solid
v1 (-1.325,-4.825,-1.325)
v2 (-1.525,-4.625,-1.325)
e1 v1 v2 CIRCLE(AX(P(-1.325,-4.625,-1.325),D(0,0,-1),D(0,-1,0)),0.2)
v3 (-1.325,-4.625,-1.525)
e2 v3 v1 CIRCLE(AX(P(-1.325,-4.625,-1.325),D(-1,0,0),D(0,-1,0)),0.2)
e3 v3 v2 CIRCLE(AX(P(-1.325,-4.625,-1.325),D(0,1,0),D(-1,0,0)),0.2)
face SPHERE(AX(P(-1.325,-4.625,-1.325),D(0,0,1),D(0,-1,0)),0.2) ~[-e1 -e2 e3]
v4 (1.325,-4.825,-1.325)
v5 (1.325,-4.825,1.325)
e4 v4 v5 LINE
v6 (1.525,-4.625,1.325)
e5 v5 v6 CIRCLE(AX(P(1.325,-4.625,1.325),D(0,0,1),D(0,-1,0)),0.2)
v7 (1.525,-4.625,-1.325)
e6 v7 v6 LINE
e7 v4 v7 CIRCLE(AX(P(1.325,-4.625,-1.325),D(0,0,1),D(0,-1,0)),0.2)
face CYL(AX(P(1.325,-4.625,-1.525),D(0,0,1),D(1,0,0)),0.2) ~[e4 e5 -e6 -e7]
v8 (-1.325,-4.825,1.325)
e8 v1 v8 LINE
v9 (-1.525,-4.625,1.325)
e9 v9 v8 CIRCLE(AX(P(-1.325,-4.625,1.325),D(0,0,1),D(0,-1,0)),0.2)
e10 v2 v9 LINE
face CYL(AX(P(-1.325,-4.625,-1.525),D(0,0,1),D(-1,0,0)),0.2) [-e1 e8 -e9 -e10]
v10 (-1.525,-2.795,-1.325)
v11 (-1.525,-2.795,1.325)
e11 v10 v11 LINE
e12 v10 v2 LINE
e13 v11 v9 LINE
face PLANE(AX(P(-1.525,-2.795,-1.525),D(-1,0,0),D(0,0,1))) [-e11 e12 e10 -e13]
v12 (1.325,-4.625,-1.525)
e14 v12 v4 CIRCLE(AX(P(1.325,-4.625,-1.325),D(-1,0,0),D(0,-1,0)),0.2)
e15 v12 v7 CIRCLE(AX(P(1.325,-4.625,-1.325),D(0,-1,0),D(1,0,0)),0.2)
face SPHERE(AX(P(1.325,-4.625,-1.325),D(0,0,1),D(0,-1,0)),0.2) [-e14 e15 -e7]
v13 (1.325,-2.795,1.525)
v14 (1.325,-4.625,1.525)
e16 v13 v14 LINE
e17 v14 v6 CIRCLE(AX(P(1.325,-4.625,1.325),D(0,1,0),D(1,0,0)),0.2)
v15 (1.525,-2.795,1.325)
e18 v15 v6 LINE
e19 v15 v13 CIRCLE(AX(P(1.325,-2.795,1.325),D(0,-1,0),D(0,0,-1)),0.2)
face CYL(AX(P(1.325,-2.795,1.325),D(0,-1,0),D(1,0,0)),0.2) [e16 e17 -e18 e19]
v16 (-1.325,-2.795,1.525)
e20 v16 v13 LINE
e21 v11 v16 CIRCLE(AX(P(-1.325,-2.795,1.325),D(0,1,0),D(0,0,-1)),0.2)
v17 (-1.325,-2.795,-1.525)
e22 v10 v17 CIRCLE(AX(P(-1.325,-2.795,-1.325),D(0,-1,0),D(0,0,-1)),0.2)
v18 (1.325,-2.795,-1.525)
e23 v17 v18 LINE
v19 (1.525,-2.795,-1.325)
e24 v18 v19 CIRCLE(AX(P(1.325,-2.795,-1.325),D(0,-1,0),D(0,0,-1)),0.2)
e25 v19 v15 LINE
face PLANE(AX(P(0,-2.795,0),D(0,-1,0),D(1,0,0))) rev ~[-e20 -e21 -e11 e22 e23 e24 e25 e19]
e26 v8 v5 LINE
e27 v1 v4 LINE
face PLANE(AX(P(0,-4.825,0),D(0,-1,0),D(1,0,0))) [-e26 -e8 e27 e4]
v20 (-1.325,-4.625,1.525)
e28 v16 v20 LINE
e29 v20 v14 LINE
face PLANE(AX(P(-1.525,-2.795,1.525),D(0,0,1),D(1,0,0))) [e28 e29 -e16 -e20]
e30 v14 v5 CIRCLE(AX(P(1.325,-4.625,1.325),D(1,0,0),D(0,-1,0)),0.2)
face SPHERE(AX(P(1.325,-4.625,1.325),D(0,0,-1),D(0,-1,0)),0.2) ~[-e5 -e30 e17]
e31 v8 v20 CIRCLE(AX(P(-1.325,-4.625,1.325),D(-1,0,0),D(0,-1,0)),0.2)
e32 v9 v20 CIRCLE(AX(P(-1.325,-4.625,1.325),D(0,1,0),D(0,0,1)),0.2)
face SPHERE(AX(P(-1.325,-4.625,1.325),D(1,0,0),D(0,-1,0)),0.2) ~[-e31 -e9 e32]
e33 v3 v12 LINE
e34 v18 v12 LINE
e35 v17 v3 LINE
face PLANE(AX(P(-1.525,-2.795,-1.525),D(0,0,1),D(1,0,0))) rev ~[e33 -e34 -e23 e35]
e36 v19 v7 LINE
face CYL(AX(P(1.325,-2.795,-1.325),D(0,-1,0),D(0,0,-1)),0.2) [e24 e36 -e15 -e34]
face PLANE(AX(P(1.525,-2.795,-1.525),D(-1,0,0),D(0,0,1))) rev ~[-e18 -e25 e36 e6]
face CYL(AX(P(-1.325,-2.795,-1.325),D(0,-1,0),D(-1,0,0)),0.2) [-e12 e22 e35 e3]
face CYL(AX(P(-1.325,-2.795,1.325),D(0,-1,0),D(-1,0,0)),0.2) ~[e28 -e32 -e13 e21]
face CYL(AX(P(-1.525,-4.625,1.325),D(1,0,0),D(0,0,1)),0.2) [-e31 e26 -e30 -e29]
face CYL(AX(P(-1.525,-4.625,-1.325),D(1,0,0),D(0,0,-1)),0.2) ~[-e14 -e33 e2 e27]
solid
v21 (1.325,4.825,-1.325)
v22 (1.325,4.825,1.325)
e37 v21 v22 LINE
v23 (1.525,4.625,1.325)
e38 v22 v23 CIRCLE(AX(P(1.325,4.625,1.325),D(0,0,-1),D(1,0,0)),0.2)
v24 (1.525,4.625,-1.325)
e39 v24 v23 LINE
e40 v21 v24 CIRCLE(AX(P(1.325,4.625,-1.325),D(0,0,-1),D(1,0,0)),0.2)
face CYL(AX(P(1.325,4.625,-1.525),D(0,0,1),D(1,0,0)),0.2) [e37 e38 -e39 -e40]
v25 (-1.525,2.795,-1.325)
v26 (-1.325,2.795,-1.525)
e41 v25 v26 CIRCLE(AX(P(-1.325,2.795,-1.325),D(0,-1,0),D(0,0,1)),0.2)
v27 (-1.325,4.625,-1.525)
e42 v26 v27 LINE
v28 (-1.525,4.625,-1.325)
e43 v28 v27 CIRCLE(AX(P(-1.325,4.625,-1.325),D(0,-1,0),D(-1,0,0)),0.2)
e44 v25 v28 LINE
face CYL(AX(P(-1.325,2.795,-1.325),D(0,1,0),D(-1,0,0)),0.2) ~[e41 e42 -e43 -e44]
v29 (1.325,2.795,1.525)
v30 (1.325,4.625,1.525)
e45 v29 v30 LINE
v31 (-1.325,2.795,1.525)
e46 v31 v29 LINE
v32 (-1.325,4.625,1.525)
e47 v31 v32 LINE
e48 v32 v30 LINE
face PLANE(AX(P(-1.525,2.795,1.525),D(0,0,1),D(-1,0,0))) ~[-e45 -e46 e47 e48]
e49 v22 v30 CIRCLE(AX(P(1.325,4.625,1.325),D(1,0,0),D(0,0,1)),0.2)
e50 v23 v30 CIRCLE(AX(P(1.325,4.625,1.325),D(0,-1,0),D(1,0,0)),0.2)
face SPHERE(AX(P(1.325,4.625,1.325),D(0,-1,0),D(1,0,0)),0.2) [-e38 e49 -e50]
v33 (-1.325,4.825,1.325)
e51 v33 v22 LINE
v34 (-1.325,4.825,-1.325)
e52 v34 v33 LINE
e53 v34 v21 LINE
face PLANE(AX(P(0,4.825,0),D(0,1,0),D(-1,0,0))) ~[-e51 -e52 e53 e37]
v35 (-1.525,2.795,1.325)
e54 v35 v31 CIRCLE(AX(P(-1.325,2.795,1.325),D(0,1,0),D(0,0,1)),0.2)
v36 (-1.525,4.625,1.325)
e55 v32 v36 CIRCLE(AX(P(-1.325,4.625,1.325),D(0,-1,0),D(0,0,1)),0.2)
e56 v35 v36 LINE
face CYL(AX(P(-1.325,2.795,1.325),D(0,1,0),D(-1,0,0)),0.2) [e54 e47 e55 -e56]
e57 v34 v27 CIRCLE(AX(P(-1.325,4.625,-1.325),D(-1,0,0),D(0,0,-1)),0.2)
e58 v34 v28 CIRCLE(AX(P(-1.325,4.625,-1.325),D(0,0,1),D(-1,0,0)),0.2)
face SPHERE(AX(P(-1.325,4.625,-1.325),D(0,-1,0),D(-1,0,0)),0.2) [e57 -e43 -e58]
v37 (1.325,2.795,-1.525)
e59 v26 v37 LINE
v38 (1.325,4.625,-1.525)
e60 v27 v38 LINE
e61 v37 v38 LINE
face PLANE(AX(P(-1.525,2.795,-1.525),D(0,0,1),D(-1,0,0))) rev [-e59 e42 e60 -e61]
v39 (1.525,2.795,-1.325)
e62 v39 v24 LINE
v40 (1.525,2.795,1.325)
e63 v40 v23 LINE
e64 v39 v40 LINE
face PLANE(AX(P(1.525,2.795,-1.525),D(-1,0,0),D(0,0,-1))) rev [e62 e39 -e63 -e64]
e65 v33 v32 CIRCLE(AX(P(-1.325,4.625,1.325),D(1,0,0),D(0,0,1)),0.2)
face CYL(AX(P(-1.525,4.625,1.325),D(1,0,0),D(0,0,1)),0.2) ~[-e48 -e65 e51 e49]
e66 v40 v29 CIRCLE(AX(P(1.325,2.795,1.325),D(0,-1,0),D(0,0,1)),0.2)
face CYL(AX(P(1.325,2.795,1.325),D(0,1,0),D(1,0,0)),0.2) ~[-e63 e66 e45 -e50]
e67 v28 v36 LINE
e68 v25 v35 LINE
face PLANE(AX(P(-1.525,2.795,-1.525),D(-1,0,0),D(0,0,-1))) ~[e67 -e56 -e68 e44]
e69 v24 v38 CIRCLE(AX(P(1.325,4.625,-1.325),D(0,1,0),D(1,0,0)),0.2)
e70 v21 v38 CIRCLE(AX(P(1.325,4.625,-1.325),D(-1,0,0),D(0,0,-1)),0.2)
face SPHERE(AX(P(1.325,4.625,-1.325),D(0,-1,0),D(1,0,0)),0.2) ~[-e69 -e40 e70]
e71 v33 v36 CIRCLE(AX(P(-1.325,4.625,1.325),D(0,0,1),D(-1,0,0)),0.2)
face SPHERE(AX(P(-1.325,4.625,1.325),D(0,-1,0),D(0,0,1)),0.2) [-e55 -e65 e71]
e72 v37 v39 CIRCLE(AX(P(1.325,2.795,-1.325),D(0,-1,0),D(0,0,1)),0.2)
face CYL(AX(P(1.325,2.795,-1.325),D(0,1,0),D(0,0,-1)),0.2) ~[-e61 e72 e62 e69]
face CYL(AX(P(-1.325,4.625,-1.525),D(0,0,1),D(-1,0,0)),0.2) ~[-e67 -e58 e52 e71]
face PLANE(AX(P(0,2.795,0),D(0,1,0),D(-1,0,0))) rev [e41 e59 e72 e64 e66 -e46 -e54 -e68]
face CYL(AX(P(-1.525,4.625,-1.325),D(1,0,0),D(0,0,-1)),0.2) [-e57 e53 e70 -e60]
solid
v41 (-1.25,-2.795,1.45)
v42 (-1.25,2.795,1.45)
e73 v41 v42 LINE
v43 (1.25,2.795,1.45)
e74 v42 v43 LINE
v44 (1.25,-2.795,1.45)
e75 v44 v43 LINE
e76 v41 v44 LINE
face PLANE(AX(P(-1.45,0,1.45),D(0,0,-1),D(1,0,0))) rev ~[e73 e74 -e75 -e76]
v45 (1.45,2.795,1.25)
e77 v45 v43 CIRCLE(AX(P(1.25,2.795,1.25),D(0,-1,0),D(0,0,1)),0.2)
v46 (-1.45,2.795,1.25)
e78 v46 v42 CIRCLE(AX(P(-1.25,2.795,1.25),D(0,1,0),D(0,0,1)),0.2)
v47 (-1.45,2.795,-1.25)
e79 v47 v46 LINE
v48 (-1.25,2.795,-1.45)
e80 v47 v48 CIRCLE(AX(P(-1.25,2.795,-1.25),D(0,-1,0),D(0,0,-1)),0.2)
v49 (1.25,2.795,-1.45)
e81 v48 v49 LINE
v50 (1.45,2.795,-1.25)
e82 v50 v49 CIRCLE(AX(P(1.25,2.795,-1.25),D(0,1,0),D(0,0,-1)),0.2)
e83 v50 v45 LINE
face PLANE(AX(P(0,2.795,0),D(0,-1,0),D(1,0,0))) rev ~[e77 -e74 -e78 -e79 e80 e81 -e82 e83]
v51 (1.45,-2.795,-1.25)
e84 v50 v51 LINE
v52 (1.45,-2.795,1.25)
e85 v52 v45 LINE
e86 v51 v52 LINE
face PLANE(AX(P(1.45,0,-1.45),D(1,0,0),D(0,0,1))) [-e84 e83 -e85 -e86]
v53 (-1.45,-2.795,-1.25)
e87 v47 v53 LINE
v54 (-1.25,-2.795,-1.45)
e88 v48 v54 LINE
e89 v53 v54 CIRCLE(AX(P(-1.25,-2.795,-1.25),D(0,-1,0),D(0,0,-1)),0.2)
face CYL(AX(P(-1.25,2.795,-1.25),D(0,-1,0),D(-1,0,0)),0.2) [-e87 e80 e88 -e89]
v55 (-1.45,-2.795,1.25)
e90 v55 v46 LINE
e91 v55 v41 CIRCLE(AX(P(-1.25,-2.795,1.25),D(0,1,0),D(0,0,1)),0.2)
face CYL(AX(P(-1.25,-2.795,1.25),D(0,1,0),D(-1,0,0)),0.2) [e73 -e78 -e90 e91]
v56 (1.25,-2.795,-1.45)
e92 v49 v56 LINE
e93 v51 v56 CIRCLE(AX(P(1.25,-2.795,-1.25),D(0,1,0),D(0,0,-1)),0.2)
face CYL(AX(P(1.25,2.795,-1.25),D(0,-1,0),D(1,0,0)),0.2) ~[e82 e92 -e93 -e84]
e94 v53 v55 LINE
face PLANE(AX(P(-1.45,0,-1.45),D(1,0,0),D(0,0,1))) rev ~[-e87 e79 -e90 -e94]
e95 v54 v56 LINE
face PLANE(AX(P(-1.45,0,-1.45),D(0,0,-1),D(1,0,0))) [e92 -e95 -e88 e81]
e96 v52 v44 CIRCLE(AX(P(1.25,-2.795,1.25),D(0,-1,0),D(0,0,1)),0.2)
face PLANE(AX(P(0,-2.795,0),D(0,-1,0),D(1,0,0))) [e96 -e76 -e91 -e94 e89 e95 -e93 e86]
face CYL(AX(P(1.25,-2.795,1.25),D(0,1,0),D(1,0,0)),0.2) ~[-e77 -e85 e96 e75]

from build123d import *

# Parameters (mm, degrees)
F2_W     = 2.9
F2_H     = 2.9
F3_DEPTH = 2.795
F4_W     = 3.05
F4_H     = 3.05
F5_DEPTH = 2.03
F6_R     = 0.2
F6_2_R   = 0.2
F6_3_R   = 0.2


# Not quite as in the source:
# - two fillets or chamfers of one size are made in one step
# - a pattern or mirror of a feature is missing from the dataset's text; its kind, count and spacing are read off the source's solid


with BuildPart() as f3:
    # F2 (on Front) → F3 (new body, symmetric)
    with BuildSketch(Plane.XZ):
        Rectangle(F2_W, F2_H)
    extrude(amount=F3_DEPTH, both=True)

    # F6#2
    f6_2_edges = [f3.edges().sort_by_distance(p)[0] for p in [
        (1.45, 0, 1.45),
        (1.45, 0, -1.45),
        (-1.45, 0, -1.45),
        (-1.45, 0, 1.45),
    ]]
    fillet(f6_2_edges, radius=F6_2_R)


with BuildPart() as f5:
    # F4 (on face) → F5 (new body)
    with BuildSketch(Plane.XZ.offset(2.795)):
        Rectangle(F4_W, F4_H)
    extrude(amount=F5_DEPTH)


with BuildPart() as f5_copies_1:
    # F5_copies: instance of F5
    add(f5.part.mirror(Plane.ZX))

    # F6#3
    f6_3_edges = [f5_copies_1.edges().sort_by_distance(p)[0] for p in [
        (1.525, 3.81, -1.525),
        (1.525, 3.81, 1.525),
        (1.525, 4.825, 0),
        (-1.525, 3.81, 1.525),
        (0, 4.825, 1.525),
        (-1.525, 3.81, -1.525),
        (-1.525, 4.825, 0),
        (0, 4.825, -1.525),
    ]]
    fillet(f6_3_edges, radius=F6_3_R)


with BuildPart() as f5_1:
    add(f5.part)

    # F6
    f6_edges = [f5_1.edges().sort_by_distance(p)[0] for p in [
        (1.525, -4.825, 0),
        (0, -4.825, 1.525),
        (-1.525, -4.825, 0),
        (0, -4.825, -1.525),
        (1.525, -3.81, -1.525),
        (-1.525, -3.81, -1.525),
        (1.525, -3.81, 1.525),
        (-1.525, -3.81, 1.525),
    ]]
    fillet(f6_edges, radius=F6_R)


solid = Compound([f3.part, f5_copies_1.part, f5_1.part])
